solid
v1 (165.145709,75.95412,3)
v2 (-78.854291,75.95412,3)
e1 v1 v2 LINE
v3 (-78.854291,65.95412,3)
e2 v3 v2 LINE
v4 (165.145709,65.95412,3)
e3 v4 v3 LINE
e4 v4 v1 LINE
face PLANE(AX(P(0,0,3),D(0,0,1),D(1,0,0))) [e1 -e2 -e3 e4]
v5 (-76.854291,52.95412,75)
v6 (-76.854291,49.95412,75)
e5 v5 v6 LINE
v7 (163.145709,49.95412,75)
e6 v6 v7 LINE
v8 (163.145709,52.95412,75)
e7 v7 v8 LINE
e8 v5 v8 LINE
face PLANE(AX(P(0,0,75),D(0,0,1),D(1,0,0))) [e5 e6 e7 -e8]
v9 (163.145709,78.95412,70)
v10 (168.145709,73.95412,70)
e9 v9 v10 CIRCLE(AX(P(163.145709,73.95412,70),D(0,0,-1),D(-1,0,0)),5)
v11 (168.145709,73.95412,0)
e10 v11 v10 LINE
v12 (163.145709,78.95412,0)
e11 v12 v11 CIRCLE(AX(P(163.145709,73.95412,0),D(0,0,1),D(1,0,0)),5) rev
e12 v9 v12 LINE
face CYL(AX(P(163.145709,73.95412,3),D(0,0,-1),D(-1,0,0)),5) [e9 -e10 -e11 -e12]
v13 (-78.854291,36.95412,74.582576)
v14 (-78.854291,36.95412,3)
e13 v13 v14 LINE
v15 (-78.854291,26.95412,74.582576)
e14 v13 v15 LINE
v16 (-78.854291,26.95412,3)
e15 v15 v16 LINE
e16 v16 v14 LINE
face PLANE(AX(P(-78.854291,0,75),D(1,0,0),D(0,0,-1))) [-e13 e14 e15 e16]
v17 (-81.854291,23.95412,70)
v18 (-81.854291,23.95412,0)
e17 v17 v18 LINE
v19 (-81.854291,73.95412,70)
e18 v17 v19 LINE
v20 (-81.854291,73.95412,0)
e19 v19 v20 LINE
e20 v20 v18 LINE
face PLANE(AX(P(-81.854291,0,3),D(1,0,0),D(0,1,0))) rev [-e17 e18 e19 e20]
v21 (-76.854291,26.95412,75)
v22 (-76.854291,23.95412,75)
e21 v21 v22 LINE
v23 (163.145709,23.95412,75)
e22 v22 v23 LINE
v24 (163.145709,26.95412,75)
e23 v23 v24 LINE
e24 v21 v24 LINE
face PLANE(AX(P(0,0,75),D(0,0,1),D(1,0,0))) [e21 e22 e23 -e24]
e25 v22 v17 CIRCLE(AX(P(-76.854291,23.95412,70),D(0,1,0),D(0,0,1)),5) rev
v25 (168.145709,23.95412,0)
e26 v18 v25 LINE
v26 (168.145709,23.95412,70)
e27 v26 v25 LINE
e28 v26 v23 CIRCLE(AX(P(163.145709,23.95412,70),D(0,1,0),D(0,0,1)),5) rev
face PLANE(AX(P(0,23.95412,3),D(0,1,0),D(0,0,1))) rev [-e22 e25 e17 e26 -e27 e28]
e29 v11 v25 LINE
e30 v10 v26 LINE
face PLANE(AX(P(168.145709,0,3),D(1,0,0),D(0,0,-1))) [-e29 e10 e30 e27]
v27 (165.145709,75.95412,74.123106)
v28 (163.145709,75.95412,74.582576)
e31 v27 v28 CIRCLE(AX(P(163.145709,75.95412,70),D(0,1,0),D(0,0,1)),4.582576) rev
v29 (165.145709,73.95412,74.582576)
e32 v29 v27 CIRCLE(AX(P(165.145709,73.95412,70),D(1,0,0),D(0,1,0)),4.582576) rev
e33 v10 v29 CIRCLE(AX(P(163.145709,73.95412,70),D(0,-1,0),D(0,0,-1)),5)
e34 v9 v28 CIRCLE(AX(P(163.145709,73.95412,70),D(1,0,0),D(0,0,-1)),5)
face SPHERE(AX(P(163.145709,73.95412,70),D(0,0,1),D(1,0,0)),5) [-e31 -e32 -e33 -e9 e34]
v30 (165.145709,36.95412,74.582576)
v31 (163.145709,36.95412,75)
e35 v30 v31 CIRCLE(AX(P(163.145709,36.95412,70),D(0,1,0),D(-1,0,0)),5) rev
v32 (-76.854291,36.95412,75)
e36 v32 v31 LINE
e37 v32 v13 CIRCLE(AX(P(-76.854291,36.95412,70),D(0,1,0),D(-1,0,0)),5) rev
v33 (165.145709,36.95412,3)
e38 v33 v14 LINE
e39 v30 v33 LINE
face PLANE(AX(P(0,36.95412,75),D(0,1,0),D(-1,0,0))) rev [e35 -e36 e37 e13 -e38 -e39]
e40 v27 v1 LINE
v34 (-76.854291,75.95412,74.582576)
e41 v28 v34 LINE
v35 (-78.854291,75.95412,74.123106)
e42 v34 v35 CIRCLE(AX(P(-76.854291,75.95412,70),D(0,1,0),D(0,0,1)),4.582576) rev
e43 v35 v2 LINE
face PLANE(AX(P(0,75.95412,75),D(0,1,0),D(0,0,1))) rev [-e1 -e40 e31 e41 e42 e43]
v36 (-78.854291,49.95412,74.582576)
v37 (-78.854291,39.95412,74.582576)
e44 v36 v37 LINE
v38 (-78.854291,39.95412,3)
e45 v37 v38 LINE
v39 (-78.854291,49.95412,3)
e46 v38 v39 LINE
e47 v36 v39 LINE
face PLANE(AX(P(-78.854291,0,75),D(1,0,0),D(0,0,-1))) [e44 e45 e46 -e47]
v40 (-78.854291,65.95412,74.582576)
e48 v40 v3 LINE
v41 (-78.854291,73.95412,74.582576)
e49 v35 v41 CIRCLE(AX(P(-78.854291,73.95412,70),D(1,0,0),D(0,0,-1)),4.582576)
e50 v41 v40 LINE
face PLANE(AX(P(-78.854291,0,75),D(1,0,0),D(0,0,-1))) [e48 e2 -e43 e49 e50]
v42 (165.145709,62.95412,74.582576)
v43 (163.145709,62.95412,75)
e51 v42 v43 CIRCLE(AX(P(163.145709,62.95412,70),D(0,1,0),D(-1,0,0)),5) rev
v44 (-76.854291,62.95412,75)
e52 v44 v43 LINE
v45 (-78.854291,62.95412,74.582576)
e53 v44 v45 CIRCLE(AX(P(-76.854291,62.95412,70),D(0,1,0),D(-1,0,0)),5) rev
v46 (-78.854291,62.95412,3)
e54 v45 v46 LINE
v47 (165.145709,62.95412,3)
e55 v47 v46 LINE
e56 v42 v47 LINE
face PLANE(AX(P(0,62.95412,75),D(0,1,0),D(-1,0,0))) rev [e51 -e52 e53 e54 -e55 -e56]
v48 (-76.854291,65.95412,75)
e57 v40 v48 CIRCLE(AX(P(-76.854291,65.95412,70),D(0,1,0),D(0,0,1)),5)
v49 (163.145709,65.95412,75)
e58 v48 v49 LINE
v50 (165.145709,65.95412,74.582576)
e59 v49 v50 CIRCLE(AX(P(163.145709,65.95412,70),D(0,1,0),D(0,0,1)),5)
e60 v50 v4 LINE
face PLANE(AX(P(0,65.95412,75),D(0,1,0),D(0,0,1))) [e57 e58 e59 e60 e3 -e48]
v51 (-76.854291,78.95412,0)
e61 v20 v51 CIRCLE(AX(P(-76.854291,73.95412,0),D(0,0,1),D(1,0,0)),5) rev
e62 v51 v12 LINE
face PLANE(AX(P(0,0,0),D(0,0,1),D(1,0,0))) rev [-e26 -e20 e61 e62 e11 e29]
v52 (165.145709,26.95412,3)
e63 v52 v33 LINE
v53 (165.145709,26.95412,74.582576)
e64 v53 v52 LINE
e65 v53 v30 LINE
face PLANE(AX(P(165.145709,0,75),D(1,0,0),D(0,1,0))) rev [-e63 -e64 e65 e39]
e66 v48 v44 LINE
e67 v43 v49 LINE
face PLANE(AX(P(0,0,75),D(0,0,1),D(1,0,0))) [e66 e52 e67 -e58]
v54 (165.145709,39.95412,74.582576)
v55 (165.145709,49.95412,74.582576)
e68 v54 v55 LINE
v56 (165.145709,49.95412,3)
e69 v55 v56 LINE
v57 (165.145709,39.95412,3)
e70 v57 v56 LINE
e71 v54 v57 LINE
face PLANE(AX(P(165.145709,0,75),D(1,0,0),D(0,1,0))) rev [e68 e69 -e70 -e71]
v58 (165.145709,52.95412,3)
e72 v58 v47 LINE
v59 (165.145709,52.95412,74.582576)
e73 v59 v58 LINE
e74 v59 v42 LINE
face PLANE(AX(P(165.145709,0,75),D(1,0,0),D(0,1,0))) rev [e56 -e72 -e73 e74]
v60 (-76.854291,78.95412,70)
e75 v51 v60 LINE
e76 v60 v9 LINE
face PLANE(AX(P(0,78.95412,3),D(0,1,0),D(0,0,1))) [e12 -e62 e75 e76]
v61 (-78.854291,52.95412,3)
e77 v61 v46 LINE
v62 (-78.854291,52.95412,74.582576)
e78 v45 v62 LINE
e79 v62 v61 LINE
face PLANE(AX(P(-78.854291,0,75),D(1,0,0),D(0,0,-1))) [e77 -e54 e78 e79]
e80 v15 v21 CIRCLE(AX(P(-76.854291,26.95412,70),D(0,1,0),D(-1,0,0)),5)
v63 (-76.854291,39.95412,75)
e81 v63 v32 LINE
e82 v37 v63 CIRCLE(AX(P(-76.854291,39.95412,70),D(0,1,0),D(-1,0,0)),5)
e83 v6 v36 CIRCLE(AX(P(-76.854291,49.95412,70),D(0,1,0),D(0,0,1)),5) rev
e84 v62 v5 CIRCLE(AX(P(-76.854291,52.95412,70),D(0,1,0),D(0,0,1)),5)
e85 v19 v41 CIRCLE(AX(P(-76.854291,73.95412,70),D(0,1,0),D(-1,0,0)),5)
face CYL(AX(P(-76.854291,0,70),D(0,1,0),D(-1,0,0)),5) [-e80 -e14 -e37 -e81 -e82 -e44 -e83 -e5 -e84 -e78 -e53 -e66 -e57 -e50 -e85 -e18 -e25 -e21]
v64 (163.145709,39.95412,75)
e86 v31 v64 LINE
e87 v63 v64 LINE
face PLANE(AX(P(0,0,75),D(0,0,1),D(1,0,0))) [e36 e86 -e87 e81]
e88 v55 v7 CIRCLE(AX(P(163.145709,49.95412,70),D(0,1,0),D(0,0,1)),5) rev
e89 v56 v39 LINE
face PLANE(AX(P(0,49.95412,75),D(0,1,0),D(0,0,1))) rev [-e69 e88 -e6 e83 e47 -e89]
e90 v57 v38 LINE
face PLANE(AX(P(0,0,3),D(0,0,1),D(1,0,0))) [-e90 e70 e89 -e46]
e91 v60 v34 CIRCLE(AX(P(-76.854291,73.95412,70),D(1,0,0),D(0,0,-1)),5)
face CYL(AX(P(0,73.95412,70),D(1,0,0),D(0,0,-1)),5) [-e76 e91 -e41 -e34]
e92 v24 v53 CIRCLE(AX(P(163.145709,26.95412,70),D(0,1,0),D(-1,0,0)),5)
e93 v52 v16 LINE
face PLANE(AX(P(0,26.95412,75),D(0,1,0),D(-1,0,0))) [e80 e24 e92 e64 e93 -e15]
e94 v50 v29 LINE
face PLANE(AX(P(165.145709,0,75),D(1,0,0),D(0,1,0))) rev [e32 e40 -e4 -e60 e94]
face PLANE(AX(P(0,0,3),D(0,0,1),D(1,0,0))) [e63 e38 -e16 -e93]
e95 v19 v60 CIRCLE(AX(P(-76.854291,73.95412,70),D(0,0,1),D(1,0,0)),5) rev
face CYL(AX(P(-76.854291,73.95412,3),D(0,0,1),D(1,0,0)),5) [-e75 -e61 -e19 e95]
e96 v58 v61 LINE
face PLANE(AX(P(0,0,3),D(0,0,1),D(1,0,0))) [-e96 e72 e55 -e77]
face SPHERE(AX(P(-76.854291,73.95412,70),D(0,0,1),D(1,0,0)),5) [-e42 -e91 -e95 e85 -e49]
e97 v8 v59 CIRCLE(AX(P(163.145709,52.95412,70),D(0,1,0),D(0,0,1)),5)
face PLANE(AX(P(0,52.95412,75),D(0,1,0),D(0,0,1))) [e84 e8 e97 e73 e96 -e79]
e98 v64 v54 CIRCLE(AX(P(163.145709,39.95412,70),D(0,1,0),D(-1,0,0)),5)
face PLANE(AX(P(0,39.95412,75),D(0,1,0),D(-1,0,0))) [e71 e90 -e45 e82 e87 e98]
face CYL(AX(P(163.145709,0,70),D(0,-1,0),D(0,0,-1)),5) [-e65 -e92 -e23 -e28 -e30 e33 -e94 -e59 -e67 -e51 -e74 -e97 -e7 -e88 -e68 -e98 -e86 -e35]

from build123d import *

# Parameters (mm, degrees)
SKETCH1_W           = 3
SKETCH1_H           = 3
SKETCH1_H_2         = 10
SKETCH1_W_2         = 244
BOSS_EXTRUDE1_DEPTH = 3
SKETCH1_4_W         = 3
SKETCH1_4_H         = 3
SKETCH1_4_H_2       = 10
SKETCH1_4_W_2       = 244
BOSS_EXTRUDE2_DEPTH = 75
FILLET1_R           = 5
FILLET2_R           = 5


with BuildPart() as part:
    # Sketch1 → Boss-Extrude1 (new body)
    with BuildSketch(Plane.XY):
        with Locations((-80.354290742, 77.454120293)):
            Rectangle(SKETCH1_W, SKETCH1_H)
        with Locations((-80.354290742, 70.954120293)):
            Rectangle(SKETCH1_W, SKETCH1_H_2)
        with Locations((-80.354290742, 64.454120293)):
            Rectangle(SKETCH1_W, SKETCH1_H)
        with Locations((-80.354290742, 57.954120293)):
            Rectangle(SKETCH1_W, SKETCH1_H_2)
        with Locations((-80.354290742, 51.454120293)):
            Rectangle(SKETCH1_W, SKETCH1_H)
        with Locations((-80.354290742, 44.954120293)):
            Rectangle(SKETCH1_W, SKETCH1_H_2)
        with Locations((-80.354290742, 38.454120293)):
            Rectangle(SKETCH1_W, SKETCH1_H)
        with Locations((-80.354290742, 31.954120293)):
            Rectangle(SKETCH1_W, SKETCH1_H_2)
        with Locations((-80.354290742, 25.454120293)):
            Rectangle(SKETCH1_W, SKETCH1_H)
        with Locations((43.145709258, 25.454120293)):
            Rectangle(SKETCH1_W_2, SKETCH1_H)
        with Locations((43.145709258, 31.954120293)):
            Rectangle(SKETCH1_W_2, SKETCH1_H_2)
        with Locations((43.145709258, 38.454120293)):
            Rectangle(SKETCH1_W_2, SKETCH1_H)
        with Locations((43.145709258, 44.954120293)):
            Rectangle(SKETCH1_W_2, SKETCH1_H_2)
        with Locations((43.145709258, 51.454120293)):
            Rectangle(SKETCH1_W_2, SKETCH1_H)
        with Locations((43.145709258, 57.954120293)):
            Rectangle(SKETCH1_W_2, SKETCH1_H_2)
        with Locations((43.145709258, 64.454120293)):
            Rectangle(SKETCH1_W_2, SKETCH1_H)
        with Locations((43.145709258, 70.954120293)):
            Rectangle(SKETCH1_W_2, SKETCH1_H_2)
        with Locations((43.145709258, 77.454120293)):
            Rectangle(SKETCH1_W_2, SKETCH1_H)
        with Locations((166.645709258, 77.454120293)):
            Rectangle(SKETCH1_W, SKETCH1_H)
        with Locations((166.645709258, 70.954120293)):
            Rectangle(SKETCH1_W, SKETCH1_H_2)
        with Locations((166.645709258, 64.454120293)):
            Rectangle(SKETCH1_W, SKETCH1_H)
        with Locations((166.645709258, 57.954120293)):
            Rectangle(SKETCH1_W, SKETCH1_H_2)
        with Locations((166.645709258, 51.454120293)):
            Rectangle(SKETCH1_W, SKETCH1_H)
        with Locations((166.645709258, 44.954120293)):
            Rectangle(SKETCH1_W, SKETCH1_H_2)
        with Locations((166.645709258, 38.454120293)):
            Rectangle(SKETCH1_W, SKETCH1_H)
        with Locations((166.645709258, 31.954120293)):
            Rectangle(SKETCH1_W, SKETCH1_H_2)
        with Locations((166.645709258, 25.454120293)):
            Rectangle(SKETCH1_W, SKETCH1_H)
    extrude(amount=BOSS_EXTRUDE1_DEPTH)

    # Sketch1<4> → Boss-Extrude2 (add)
    with BuildSketch(Plane.XY):
        with Locations((-80.354290742, 77.454120293)):
            Rectangle(SKETCH1_4_W, SKETCH1_4_H)
        with Locations((-80.354290742, 70.954120293)):
            Rectangle(SKETCH1_4_W, SKETCH1_4_H_2)
        with Locations((-80.354290742, 64.454120293)):
            Rectangle(SKETCH1_4_W, SKETCH1_4_H)
        with Locations((-80.354290742, 57.954120293)):
            Rectangle(SKETCH1_4_W, SKETCH1_4_H_2)
        with Locations((-80.354290742, 51.454120293)):
            Rectangle(SKETCH1_4_W, SKETCH1_4_H)
        with Locations((-80.354290742, 44.954120293)):
            Rectangle(SKETCH1_4_W, SKETCH1_4_H_2)
        with Locations((43.145709258, 51.454120293)):
            Rectangle(SKETCH1_4_W_2, SKETCH1_4_H)
        with Locations((43.145709258, 64.454120293)):
            Rectangle(SKETCH1_4_W_2, SKETCH1_4_H)
        with Locations((43.145709258, 77.454120293)):
            Rectangle(SKETCH1_4_W_2, SKETCH1_4_H)
        with Locations((-80.354290742, 38.454120293)):
            Rectangle(SKETCH1_4_W, SKETCH1_4_H)
        with Locations((-80.354290742, 31.954120293)):
            Rectangle(SKETCH1_4_W, SKETCH1_4_H_2)
        with Locations((-80.354290742, 25.454120293)):
            Rectangle(SKETCH1_4_W, SKETCH1_4_H)
        with Locations((43.145709258, 25.454120293)):
            Rectangle(SKETCH1_4_W_2, SKETCH1_4_H)
        with Locations((43.145709258, 38.454120293)):
            Rectangle(SKETCH1_4_W_2, SKETCH1_4_H)
        with Locations((166.645709258, 77.454120293)):
            Rectangle(SKETCH1_4_W, SKETCH1_4_H)
        with Locations((166.645709258, 70.954120293)):
            Rectangle(SKETCH1_4_W, SKETCH1_4_H_2)
        with Locations((166.645709258, 64.454120293)):
            Rectangle(SKETCH1_4_W, SKETCH1_4_H)
        with Locations((166.645709258, 57.954120293)):
            Rectangle(SKETCH1_4_W, SKETCH1_4_H_2)
        with Locations((166.645709258, 51.454120293)):
            Rectangle(SKETCH1_4_W, SKETCH1_4_H)
        with Locations((166.645709258, 44.954120293)):
            Rectangle(SKETCH1_4_W, SKETCH1_4_H_2)
        with Locations((166.645709258, 38.454120293)):
            Rectangle(SKETCH1_4_W, SKETCH1_4_H)
        with Locations((166.645709258, 31.954120293)):
            Rectangle(SKETCH1_4_W, SKETCH1_4_H_2)
        with Locations((166.645709258, 25.454120293)):
            Rectangle(SKETCH1_4_W, SKETCH1_4_H)
    extrude(amount=BOSS_EXTRUDE2_DEPTH)

    # Fillet1
    fillet1_edges = [part.edges().sort_by_distance(p)[0] for p in [
        (-81.854290742, 78.954120293, 37.5),
        (168.145709258, 78.954120293, 37.5),
    ]]
    fillet(fillet1_edges, radius=FILLET1_R)

    # Fillet2
    # the kernel refuses this fillet: 5 mm, written as the material it takes off along each edge
    with BuildSketch(Plane(origin=(168.145709258, 73.954120293, 75), x_dir=(-1, 0, 0), z_dir=(0, -1, 0)), Plane(origin=(-81.854290742, 11.454120293, 75), x_dir=(1, 0, 0), z_dir=(0, 1, 0))) as fillet2_piece_1:
        with BuildLine():
            CenterArc((FILLET2_R, FILLET2_R), FILLET2_R, 180, 90)
            Line((0, FILLET2_R), (0, 0))
            Line((0, 0), (FILLET2_R, 0))
        make_face()
    extrude(amount=62.5, mode=Mode.SUBTRACT)
    with BuildSketch(Plane(origin=(-76.854290742, 73.954120293, 75), x_dir=(0, 1, 0), z_dir=(1, 0, 0))) as fillet2_piece_2:
        with BuildLine():
            CenterArc((5 - FILLET2_R, -FILLET2_R), FILLET2_R, 0, 90)
            Line((5 - FILLET2_R, 0), (5, 0))
            Line((5, 0), (5, -FILLET2_R))
        make_face()
    revolve(axis=Axis((-76.854290742, 73.954120293, 75), (0, 0, 1)), revolution_arc=90, mode=Mode.SUBTRACT)
    with BuildSketch(Plane(origin=(-76.854290742, 78.954120293, 75), x_dir=(0, 0, -1), z_dir=(1, 0, 0))) as fillet2_piece_3:
        with BuildLine():
            CenterArc((FILLET2_R, -FILLET2_R), FILLET2_R, 90, 90)
            Line((0, -FILLET2_R), (0, 0))
            Line((0, 0), (FILLET2_R, 0))
        make_face()
    extrude(amount=240, mode=Mode.SUBTRACT)
    with BuildSketch(Plane(origin=(163.145709258, 73.954120293, 75), x_dir=(0, 1, 0), z_dir=(-1, 0, 0))) as fillet2_piece_4:
        with BuildLine():
            CenterArc((5 - FILLET2_R, FILLET2_R), FILLET2_R, 270, 90)
            Line((5 - FILLET2_R, 0), (5, 0))
            Line((5, 0), (5, FILLET2_R))
        make_face()
    revolve(axis=Axis((163.145709258, 73.954120293, 75), (0, 0, -1)), revolution_arc=90, mode=Mode.SUBTRACT)


solid = part.part
